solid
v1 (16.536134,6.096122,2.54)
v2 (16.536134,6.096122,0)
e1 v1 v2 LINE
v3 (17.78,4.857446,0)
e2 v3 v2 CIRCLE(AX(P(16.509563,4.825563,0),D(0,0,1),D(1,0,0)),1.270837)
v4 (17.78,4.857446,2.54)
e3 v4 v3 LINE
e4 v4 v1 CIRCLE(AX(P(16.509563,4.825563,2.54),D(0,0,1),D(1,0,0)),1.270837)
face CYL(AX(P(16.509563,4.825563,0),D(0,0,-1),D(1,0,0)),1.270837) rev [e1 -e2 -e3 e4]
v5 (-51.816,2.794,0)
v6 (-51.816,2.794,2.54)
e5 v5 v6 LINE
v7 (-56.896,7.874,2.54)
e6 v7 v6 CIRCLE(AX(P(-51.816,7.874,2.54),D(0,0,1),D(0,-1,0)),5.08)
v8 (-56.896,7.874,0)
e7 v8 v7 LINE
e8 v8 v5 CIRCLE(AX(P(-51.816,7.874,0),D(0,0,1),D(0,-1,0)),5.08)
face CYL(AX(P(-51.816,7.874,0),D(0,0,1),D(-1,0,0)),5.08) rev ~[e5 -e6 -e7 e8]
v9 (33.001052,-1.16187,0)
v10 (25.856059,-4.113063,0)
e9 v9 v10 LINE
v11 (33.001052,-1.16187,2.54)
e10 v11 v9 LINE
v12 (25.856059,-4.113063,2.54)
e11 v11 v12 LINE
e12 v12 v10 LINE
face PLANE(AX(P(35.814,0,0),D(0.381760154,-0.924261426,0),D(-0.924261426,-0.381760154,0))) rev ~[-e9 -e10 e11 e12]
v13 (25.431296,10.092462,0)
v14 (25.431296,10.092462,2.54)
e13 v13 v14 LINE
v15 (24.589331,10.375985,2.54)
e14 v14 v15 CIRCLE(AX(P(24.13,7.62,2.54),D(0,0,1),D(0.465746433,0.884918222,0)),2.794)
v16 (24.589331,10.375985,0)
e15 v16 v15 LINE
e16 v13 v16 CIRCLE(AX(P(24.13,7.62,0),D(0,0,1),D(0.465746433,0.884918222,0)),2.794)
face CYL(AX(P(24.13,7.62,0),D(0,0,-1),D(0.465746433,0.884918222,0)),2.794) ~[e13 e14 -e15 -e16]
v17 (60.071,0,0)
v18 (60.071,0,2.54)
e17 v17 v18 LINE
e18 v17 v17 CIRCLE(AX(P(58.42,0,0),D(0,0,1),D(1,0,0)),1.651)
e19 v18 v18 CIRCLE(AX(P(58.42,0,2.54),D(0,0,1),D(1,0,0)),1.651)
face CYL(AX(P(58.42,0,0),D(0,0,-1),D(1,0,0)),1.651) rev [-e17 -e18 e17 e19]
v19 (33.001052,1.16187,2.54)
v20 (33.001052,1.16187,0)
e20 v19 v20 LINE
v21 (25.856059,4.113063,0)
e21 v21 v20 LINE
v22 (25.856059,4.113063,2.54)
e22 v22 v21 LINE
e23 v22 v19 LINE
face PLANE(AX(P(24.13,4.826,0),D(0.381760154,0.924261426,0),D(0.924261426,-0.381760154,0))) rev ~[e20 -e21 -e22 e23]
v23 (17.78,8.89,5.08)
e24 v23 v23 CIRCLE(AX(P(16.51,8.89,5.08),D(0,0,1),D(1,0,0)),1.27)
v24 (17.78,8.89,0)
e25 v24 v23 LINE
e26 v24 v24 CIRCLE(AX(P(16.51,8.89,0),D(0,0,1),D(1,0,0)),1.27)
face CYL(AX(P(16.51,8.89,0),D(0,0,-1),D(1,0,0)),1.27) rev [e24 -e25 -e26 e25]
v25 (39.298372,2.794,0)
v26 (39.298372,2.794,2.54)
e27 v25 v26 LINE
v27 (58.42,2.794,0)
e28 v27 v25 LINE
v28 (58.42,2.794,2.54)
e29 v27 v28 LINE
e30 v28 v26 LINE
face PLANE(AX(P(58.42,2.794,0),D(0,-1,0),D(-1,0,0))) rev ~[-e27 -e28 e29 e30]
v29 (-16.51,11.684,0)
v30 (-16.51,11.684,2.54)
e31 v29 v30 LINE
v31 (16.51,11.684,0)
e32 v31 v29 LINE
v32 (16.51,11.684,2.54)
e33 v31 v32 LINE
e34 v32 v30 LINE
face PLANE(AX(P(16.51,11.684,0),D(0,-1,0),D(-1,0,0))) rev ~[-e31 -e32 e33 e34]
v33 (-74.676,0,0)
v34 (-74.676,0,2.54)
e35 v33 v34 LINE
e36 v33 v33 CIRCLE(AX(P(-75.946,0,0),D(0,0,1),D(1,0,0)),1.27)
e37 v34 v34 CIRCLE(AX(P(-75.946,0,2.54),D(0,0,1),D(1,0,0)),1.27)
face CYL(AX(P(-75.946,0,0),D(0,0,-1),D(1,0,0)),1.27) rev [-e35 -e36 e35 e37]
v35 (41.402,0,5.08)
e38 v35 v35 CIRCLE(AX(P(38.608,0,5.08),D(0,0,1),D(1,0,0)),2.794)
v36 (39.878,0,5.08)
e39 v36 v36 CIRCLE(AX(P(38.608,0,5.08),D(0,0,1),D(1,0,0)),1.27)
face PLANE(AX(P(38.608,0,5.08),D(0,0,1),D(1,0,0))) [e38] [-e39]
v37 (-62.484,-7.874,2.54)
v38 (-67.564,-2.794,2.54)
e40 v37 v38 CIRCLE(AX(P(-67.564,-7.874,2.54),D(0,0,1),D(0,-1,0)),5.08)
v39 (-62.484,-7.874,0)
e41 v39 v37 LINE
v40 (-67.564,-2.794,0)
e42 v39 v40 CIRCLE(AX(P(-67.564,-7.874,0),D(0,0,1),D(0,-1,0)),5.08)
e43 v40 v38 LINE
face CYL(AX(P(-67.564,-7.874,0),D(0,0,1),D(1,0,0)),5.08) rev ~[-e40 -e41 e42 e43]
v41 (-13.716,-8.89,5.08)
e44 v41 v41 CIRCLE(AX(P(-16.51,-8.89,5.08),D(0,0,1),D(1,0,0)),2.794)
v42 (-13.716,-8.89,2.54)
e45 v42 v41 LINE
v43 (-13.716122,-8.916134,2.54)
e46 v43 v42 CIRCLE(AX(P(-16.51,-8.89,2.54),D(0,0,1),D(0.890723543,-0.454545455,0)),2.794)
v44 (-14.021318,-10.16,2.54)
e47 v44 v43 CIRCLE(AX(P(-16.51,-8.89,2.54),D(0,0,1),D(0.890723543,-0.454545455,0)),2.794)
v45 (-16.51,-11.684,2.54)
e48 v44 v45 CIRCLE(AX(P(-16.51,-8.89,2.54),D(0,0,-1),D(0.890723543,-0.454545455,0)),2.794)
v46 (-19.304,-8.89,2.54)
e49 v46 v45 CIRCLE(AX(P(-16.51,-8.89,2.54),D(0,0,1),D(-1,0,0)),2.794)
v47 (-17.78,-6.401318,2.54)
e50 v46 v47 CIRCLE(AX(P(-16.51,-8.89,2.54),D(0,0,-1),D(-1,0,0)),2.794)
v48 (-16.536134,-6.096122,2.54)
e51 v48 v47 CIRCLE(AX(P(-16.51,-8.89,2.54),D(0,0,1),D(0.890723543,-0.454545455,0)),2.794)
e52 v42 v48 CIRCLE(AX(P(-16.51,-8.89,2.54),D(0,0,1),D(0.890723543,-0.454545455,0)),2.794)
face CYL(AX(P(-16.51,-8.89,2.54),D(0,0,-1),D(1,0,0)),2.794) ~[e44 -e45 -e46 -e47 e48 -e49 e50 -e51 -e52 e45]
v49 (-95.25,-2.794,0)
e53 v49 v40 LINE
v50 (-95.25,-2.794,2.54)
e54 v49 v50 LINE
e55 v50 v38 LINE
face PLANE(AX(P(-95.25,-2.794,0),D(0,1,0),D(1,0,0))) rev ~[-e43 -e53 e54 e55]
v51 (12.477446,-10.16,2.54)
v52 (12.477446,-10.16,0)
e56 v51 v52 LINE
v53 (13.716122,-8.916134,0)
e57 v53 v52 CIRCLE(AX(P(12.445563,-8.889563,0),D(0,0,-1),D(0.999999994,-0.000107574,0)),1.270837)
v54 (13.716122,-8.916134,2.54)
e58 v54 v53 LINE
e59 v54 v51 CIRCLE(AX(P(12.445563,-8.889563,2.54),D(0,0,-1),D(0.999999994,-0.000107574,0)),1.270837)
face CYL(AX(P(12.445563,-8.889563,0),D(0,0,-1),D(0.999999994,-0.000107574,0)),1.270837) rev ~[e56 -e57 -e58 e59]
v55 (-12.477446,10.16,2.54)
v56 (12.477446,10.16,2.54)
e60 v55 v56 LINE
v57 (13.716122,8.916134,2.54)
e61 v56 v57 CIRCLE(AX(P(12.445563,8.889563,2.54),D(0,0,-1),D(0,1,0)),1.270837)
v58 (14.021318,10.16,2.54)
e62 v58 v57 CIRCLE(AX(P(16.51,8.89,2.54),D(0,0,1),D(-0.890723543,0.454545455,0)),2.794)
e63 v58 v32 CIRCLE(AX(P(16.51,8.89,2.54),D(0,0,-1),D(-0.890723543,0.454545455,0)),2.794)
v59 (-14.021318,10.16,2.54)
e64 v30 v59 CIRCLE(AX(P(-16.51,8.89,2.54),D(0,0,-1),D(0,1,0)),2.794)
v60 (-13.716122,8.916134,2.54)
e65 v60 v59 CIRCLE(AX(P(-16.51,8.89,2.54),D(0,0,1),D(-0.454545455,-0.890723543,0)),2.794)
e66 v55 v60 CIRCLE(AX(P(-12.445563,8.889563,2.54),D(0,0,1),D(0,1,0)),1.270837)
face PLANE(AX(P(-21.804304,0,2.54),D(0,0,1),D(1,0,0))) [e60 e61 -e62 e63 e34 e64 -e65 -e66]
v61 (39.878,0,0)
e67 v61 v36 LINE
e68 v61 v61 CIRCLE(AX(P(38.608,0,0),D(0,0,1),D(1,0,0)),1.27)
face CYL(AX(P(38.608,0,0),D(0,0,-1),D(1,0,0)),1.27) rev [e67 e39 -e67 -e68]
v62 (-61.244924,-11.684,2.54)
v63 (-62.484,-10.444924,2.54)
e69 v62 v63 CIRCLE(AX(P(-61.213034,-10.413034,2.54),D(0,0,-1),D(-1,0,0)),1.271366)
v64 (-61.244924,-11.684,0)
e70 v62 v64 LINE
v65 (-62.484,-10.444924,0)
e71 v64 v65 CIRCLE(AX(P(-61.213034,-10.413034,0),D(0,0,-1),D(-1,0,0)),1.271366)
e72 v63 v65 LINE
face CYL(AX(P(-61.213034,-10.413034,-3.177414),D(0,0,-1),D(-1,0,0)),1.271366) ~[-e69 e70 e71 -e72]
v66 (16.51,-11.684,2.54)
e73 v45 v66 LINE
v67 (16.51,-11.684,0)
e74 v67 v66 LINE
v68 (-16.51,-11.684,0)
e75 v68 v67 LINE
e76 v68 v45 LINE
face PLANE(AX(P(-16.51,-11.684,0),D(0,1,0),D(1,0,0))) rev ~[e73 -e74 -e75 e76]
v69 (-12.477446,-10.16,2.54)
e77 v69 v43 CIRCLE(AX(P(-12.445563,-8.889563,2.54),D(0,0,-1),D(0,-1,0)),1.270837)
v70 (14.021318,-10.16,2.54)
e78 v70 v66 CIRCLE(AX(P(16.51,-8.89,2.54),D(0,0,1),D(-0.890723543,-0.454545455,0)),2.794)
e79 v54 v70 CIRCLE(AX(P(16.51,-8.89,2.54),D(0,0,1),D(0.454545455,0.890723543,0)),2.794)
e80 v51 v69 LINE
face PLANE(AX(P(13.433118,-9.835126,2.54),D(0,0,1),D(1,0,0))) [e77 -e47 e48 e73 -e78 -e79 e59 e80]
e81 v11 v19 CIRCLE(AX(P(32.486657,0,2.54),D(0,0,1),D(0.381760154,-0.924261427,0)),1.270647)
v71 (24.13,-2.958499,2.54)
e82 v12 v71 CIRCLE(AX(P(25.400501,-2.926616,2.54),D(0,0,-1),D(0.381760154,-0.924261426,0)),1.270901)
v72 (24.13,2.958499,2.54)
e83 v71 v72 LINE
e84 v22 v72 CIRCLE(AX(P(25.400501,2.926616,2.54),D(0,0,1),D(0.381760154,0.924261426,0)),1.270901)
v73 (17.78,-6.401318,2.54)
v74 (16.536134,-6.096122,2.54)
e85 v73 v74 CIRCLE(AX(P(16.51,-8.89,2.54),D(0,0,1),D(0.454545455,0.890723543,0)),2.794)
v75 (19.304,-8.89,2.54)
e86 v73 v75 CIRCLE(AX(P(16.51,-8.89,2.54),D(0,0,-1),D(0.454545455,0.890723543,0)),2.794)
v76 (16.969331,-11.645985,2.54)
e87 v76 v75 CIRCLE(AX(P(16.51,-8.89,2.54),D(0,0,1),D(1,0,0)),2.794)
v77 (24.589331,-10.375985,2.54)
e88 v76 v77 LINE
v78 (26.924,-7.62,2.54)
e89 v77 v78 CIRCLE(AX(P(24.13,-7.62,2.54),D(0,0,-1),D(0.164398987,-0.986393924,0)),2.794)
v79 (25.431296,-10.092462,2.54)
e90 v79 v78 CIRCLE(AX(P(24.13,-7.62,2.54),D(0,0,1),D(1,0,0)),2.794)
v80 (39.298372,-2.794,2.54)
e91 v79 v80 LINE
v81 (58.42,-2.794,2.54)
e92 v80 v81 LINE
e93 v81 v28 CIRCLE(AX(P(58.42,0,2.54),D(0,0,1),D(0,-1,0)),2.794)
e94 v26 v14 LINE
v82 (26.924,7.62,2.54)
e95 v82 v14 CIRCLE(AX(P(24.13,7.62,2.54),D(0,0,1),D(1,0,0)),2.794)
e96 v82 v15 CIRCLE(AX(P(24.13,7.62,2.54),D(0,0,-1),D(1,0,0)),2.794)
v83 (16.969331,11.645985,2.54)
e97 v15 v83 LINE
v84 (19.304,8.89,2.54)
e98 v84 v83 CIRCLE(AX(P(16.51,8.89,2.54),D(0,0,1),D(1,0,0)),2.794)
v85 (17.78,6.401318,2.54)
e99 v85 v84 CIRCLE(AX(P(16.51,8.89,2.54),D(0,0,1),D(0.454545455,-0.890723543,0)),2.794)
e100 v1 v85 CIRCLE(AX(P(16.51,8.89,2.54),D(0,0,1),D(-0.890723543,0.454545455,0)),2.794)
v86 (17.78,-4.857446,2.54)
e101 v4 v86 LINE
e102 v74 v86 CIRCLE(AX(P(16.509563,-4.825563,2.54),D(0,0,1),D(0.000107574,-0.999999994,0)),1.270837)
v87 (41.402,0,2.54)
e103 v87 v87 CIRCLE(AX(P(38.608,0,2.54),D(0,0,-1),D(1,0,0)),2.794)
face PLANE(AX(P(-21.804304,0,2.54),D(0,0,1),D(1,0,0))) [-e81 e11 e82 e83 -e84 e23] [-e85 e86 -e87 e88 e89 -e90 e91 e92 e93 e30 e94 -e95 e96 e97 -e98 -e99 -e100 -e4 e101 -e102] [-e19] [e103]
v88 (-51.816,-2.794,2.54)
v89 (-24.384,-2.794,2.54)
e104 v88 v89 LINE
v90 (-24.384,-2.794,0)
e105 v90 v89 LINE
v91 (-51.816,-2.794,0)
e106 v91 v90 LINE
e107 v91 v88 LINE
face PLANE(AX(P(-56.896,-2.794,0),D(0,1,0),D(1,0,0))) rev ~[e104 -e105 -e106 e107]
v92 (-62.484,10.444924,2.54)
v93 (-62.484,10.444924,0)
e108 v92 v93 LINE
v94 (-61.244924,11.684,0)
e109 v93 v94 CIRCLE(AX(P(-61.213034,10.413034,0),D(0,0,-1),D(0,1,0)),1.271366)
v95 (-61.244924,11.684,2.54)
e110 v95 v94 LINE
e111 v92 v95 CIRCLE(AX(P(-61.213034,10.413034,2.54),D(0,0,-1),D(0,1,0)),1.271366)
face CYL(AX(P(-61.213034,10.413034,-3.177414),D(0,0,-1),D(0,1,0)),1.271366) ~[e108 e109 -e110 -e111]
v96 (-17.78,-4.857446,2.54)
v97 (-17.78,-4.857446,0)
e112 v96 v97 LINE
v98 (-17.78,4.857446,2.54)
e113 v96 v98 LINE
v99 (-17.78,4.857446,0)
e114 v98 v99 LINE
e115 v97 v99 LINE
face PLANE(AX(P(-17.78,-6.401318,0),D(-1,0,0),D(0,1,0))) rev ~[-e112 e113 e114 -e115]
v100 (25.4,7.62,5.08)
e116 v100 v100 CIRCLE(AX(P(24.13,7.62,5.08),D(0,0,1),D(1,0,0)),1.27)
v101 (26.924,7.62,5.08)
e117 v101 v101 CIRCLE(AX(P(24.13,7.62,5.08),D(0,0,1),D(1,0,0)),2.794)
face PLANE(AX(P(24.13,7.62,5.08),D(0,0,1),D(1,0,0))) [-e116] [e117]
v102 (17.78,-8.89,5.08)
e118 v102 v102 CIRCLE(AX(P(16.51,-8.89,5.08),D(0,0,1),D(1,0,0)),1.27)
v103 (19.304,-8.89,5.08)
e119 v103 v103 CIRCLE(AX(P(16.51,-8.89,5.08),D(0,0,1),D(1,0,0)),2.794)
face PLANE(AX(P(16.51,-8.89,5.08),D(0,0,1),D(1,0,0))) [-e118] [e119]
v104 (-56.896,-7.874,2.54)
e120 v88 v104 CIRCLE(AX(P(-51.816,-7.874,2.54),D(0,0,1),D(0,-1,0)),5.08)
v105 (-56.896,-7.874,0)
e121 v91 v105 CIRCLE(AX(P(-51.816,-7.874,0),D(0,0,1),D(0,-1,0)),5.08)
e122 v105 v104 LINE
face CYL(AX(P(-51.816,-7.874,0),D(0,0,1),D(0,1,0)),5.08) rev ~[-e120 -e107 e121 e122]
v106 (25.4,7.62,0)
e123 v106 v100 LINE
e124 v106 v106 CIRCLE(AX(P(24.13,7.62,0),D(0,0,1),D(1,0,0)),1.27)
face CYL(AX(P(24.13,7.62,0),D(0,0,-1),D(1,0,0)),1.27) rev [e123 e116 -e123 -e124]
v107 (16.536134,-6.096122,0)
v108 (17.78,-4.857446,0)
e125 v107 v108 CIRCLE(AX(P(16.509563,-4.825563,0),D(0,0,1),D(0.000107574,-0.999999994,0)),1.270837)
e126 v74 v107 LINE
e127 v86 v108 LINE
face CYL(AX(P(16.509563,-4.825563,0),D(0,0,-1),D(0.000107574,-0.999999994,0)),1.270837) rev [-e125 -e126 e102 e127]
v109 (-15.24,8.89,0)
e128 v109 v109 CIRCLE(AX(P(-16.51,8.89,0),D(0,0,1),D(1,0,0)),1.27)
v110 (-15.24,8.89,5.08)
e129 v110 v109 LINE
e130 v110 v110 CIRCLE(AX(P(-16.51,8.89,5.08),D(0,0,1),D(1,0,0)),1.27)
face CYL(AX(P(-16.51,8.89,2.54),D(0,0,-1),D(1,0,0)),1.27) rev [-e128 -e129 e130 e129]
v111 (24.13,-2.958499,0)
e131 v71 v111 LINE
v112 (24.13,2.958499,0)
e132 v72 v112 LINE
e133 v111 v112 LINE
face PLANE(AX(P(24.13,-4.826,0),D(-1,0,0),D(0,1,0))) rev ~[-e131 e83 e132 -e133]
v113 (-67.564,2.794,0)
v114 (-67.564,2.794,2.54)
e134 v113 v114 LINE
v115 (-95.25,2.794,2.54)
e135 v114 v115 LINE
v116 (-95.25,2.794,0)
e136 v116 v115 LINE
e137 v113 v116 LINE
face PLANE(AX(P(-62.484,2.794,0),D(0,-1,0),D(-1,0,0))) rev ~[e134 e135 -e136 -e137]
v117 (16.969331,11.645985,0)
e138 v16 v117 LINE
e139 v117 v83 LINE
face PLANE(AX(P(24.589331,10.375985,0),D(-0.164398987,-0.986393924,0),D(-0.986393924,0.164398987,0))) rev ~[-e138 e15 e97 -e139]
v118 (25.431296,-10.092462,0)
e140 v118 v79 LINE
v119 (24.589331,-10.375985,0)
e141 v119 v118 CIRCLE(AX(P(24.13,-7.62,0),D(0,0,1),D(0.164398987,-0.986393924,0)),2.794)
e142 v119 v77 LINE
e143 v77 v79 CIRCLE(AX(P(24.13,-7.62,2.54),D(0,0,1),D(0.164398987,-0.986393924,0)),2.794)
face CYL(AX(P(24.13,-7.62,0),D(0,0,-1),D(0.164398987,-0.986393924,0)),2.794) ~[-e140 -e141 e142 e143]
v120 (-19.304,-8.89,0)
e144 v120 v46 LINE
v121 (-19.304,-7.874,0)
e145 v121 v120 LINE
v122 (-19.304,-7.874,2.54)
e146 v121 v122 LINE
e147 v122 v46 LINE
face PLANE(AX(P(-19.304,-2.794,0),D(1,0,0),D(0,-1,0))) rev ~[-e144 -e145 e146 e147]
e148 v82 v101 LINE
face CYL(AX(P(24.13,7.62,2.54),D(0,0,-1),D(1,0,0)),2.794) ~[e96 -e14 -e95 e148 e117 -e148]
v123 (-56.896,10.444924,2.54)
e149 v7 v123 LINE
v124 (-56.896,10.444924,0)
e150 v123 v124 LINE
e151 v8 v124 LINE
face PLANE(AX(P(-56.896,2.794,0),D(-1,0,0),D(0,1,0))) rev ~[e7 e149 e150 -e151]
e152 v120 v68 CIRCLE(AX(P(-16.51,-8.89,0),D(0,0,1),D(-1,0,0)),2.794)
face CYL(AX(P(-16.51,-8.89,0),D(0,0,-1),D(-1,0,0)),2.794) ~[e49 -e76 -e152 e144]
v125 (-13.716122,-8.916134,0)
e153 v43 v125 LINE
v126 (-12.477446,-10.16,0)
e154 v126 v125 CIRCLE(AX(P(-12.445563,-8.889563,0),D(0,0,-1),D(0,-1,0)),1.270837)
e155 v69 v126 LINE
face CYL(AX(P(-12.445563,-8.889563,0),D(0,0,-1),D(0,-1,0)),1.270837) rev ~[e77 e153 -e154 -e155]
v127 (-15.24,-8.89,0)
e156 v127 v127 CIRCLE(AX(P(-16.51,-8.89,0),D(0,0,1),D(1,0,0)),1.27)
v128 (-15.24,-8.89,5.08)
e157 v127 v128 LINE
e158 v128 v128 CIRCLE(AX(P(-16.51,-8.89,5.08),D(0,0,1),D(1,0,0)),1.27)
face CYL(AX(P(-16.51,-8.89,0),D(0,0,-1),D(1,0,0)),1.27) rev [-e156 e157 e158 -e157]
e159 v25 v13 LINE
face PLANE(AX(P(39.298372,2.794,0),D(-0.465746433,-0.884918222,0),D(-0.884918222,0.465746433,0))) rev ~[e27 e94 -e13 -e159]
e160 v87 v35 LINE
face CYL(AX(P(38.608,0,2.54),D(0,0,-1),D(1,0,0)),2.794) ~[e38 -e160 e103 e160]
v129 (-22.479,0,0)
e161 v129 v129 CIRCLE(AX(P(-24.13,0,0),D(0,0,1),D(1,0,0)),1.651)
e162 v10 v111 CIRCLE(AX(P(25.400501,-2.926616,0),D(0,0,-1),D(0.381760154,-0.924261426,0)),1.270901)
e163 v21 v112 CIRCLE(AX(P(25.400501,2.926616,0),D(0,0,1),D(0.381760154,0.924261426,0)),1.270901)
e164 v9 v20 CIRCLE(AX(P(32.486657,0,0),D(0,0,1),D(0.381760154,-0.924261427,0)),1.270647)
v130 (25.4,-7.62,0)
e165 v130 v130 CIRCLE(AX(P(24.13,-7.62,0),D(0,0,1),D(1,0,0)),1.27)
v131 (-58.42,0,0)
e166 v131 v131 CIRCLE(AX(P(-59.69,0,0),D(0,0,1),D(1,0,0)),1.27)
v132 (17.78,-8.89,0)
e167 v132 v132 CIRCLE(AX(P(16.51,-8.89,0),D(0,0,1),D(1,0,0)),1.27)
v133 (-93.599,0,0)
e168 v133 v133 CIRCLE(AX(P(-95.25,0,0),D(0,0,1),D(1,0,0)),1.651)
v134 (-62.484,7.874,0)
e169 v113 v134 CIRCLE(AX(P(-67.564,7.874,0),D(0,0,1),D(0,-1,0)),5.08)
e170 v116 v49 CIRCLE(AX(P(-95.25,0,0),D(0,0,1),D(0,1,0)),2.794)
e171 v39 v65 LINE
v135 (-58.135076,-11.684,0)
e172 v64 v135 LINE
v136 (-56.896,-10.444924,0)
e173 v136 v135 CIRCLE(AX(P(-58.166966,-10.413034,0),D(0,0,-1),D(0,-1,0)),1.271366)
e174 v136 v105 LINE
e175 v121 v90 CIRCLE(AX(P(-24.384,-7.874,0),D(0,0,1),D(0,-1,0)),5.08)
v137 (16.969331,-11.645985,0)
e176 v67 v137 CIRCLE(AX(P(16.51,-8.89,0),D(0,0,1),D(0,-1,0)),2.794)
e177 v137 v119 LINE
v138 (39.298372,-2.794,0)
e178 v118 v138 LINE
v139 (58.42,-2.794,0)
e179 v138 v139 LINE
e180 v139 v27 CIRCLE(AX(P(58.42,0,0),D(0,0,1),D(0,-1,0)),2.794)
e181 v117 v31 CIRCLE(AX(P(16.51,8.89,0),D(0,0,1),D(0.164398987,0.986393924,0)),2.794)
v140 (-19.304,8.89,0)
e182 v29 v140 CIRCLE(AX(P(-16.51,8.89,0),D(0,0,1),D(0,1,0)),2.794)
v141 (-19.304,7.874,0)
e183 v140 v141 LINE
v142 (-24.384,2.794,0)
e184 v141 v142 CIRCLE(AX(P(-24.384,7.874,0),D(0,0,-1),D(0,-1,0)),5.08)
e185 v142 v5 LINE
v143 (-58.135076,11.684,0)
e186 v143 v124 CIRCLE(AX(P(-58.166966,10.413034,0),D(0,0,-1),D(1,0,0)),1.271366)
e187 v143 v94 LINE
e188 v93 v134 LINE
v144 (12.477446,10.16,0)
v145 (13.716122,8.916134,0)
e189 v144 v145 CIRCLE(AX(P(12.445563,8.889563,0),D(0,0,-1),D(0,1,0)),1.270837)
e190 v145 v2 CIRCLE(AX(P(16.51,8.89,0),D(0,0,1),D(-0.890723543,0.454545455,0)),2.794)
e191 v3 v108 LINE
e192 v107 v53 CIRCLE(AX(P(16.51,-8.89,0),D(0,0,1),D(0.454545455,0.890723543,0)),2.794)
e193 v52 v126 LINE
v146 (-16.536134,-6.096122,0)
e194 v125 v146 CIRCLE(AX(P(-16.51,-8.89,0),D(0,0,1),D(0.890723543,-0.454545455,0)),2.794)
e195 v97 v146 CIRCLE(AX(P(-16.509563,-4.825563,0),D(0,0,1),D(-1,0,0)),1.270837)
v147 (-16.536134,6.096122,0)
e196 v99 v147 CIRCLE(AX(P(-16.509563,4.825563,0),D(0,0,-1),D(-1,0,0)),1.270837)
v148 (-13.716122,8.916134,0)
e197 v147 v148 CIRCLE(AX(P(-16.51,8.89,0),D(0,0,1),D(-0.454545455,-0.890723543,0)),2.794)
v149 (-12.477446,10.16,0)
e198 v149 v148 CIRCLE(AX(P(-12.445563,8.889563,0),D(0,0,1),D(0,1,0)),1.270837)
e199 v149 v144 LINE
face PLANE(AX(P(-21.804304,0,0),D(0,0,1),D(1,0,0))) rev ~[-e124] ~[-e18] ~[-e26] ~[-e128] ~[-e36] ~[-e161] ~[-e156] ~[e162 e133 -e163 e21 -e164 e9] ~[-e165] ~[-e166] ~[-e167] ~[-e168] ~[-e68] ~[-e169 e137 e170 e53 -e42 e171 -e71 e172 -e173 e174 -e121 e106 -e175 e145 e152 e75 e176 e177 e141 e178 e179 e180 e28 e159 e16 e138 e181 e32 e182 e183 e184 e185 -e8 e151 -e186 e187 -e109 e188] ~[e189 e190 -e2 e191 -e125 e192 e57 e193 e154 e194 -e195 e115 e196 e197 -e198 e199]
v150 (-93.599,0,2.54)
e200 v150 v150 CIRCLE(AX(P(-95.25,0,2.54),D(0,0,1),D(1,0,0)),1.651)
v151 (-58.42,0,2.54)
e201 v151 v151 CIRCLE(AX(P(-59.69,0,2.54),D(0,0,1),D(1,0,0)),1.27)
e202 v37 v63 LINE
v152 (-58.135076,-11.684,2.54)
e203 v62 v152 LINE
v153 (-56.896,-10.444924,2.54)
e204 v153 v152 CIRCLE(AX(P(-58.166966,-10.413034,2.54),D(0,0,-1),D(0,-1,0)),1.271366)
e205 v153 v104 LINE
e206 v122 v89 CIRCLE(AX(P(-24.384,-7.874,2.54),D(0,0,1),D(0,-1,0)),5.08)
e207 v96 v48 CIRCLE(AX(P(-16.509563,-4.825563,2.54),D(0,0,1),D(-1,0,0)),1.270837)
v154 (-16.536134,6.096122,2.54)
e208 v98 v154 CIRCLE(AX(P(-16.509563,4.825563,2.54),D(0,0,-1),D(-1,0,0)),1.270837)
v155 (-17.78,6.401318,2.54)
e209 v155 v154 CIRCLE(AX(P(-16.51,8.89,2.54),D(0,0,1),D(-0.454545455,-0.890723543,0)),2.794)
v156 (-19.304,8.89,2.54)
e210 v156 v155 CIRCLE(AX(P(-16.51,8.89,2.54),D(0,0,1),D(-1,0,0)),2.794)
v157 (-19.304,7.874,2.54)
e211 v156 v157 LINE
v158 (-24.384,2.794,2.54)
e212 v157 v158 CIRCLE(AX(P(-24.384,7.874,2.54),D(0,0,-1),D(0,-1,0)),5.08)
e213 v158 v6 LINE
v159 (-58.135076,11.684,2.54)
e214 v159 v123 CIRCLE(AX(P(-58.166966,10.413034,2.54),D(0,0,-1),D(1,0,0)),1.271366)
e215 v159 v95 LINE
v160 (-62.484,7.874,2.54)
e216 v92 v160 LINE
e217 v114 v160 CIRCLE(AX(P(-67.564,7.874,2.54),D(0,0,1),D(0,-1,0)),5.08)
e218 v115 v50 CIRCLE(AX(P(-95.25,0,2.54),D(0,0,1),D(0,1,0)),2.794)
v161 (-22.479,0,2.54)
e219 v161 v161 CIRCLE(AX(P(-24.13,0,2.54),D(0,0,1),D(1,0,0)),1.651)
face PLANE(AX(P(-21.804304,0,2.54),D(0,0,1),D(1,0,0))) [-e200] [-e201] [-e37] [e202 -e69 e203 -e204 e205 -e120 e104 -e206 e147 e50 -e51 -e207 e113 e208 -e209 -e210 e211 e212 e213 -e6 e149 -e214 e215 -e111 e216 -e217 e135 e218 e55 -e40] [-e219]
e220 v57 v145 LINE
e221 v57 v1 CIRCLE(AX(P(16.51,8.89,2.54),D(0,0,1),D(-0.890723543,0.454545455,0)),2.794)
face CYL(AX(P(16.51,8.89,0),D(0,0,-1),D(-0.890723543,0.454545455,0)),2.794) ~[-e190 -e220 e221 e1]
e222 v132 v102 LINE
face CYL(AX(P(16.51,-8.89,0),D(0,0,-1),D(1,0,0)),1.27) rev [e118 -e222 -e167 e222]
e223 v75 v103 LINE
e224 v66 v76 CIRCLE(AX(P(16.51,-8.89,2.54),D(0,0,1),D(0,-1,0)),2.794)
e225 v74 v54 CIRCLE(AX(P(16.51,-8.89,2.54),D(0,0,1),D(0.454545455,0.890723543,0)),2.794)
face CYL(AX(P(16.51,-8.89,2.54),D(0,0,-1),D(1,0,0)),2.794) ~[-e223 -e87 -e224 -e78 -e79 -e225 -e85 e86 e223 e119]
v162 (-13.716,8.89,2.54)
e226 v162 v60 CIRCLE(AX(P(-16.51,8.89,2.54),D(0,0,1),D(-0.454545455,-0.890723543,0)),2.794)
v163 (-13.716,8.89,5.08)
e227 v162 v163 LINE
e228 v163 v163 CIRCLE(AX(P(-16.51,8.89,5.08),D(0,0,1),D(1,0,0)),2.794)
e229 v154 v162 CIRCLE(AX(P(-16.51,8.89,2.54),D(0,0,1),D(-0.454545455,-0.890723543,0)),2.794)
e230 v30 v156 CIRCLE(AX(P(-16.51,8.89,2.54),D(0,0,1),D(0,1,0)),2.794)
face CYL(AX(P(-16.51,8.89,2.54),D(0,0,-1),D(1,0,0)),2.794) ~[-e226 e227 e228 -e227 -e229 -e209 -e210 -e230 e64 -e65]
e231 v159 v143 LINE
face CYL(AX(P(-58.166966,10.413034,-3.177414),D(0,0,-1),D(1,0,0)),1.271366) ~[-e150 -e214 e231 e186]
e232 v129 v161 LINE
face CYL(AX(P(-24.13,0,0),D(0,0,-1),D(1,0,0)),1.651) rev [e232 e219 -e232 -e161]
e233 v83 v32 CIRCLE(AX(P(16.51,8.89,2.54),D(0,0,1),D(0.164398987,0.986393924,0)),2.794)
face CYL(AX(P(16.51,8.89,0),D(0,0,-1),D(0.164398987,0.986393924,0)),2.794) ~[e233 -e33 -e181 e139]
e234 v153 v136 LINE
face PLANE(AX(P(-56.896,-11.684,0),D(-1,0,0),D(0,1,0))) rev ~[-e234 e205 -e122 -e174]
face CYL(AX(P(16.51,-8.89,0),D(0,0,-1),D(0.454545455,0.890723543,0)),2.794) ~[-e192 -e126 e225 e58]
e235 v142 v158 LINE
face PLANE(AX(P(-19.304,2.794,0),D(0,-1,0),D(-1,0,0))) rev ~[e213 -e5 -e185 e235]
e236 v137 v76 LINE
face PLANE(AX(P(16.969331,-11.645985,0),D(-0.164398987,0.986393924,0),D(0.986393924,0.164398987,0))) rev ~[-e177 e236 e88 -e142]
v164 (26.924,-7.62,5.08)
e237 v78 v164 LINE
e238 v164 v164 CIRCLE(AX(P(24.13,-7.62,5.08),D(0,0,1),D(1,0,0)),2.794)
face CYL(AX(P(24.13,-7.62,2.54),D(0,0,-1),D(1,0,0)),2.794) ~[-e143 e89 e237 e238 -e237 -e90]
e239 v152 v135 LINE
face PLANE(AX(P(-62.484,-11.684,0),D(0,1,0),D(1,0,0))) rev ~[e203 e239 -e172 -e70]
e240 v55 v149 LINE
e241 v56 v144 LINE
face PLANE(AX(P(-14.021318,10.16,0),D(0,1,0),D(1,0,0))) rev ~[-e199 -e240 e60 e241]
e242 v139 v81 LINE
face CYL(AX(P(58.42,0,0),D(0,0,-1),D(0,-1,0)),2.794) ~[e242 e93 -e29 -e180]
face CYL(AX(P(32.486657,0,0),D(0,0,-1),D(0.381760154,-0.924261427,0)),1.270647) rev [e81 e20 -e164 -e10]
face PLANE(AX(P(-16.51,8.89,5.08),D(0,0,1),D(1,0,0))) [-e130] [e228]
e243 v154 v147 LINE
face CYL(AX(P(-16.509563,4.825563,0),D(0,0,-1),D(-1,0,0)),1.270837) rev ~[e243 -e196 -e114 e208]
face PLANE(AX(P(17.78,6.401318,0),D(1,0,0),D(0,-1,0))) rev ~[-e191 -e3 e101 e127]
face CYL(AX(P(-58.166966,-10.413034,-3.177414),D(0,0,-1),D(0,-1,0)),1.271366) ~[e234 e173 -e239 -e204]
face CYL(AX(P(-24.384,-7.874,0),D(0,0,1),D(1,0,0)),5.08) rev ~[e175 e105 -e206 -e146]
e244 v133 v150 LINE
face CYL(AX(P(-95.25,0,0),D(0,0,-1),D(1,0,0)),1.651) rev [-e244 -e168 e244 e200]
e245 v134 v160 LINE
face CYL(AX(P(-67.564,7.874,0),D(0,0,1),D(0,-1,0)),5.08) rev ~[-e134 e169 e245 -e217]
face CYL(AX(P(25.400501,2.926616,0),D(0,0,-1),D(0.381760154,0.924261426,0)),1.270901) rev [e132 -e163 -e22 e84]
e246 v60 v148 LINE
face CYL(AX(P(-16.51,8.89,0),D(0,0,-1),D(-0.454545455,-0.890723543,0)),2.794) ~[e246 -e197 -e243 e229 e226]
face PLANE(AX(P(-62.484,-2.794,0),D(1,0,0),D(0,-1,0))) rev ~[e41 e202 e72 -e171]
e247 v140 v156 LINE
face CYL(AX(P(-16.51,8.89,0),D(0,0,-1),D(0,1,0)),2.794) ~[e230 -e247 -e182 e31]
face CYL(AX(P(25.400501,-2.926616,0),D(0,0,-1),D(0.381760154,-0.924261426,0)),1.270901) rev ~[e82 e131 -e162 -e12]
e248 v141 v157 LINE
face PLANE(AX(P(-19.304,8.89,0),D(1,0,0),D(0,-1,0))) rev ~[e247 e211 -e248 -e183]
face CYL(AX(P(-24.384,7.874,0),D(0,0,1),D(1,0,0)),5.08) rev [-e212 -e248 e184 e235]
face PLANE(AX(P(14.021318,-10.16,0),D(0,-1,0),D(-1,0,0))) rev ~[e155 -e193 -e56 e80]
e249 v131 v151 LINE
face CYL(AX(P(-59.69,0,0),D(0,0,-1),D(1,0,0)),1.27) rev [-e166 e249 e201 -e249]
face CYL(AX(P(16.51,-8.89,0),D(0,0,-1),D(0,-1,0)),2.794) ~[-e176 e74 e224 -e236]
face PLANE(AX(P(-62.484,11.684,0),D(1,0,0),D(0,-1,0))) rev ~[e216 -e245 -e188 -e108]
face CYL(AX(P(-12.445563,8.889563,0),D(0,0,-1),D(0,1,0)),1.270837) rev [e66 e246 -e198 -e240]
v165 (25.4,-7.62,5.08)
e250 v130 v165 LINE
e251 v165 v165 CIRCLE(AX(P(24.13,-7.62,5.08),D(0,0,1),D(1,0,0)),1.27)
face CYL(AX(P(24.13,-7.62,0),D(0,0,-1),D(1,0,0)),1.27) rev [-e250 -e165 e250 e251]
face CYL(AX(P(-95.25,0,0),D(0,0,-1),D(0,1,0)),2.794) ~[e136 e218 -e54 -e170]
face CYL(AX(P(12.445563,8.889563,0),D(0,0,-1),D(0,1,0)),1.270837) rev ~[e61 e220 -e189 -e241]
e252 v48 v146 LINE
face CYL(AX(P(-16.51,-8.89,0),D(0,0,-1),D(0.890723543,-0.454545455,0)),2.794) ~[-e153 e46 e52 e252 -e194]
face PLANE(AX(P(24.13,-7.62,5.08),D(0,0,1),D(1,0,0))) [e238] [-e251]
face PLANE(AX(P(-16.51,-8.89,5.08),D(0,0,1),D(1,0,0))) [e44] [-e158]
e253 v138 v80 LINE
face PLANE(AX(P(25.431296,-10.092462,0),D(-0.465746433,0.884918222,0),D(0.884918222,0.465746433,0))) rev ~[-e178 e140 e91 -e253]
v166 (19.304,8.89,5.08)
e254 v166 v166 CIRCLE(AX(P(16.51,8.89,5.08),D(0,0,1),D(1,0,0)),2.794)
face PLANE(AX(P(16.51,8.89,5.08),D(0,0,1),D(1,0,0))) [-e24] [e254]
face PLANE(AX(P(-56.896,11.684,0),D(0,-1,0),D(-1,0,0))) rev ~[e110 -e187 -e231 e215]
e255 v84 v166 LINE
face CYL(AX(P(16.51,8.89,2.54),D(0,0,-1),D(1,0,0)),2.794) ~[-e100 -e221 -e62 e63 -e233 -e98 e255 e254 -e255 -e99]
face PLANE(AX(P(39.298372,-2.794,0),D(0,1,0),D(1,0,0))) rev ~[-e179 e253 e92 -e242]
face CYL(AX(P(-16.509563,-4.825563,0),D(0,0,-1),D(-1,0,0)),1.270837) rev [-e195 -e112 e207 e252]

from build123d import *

# Parameters (mm, degrees)
F1_R        = 1.27
F1_R_2      = 1.651
F2_DEPTH    = 2.54
F3_R        = 2.794
F3_R_2      = 1.27
F4_DEPTH    = 2.54
F5_T1_DEPTH = 2.54
F5_T3_DEPTH = 8.8948287418
F6_R        = 5.08


# Not quite as in the source:
# - a fillet or chamfer that OpenCascade refuses, or shapes differently, is made with other operations: its cross-section is extruded or revolved along the edge and cut away or added


with BuildPart() as f2:
    # F1 (on Top) → F2 (new body)
    with BuildSketch(Plane.XY):
        with BuildLine():
            ThreePointArc((-16.51, 11.684), (-18.4856563466, 10.8656563466), (-19.304, 8.89))
            Line((-19.304, 8.89), (-19.304, 2.794))
            Line((-19.304, 2.794), (-24.13, 2.794))
            Line((-24.13, 2.794), (-56.896, 2.794))
            Line((-56.896, 2.794), (-56.896, 11.684))
            Line((-56.896, 11.684), (-62.484, 11.684))
            Line((-62.484, 11.684), (-62.484, 2.794))
            Line((-62.484, 2.794), (-95.25, 2.794))
            ThreePointArc((-95.25, 2.794), (-98.044, 0), (-95.25, -2.794))
            Line((-95.25, -2.794), (-62.484, -2.794))
            Line((-62.484, -2.794), (-62.484, -11.684))
            Line((-62.484, -11.684), (-56.896, -11.684))
            Line((-56.896, -11.684), (-56.896, -2.794))
            Line((-56.896, -2.794), (-24.13, -2.794))
            Line((-24.13, -2.794), (-19.304, -2.794))
            Line((-19.304, -2.794), (-19.304, -8.89))
            ThreePointArc((-19.304, -8.89), (-18.4856563466, -10.8656563466), (-16.51, -11.684))
            Line((-16.51, -11.684), (16.51, -11.684))
            ThreePointArc((16.51, -11.684), (16.7404506051, -11.6744799368), (16.9693307705, -11.6459846232))
            Line((16.9693307705, -11.6459846232), (24.5893307705, -10.3759846232))
            ThreePointArc((24.5893307705, -10.3759846232), (25.0216544083, -10.2679026448), (25.4312955333, -10.0924615133))
            Line((25.4312955333, -10.0924615133), (39.2983724087, -2.794))
            Line((39.2983724087, -2.794), (58.42, -2.794))
            ThreePointArc((58.42, -2.794), (61.214, 0), (58.42, 2.794))
            Line((58.42, 2.794), (39.2983724087, 2.794))
            Line((39.2983724087, 2.794), (25.4312955333, 10.0924615133))
            ThreePointArc((25.4312955333, 10.0924615133), (25.0216544083, 10.2679026448), (24.5893307705, 10.3759846232))
            Line((24.5893307705, 10.3759846232), (16.9693307705, 11.6459846232))
            ThreePointArc((16.9693307705, 11.6459846232), (16.7404506051, 11.6744799368), (16.51, 11.684))
            Line((16.51, 11.684), (-16.51, 11.684))
        make_face()
        with Locations((-16.51, -8.89)):
            Circle(F1_R, mode=Mode.SUBTRACT)
        with Locations((16.51, -8.89)):
            Circle(F1_R, mode=Mode.SUBTRACT)
        with Locations((24.13, -7.62)):
            Circle(F1_R, mode=Mode.SUBTRACT)
        with Locations((-95.25, 0)):
            Circle(F1_R_2, mode=Mode.SUBTRACT)
        with Locations((-75.946, 0)):
            Circle(F1_R, mode=Mode.SUBTRACT)
        with Locations((-59.69, 0)):
            Circle(F1_R, mode=Mode.SUBTRACT)
        with Locations((-24.13, 0)):
            Circle(F1_R_2, mode=Mode.SUBTRACT)
        with BuildLine():
            Line((-17.78, -6.4013184213), (-17.78, 6.4013184213))
            ThreePointArc((-17.78, 6.4013184213), (-14.5343436534, 6.9143436534), (-14.0213184213, 10.16))
            Line((-14.0213184213, 10.16), (14.0213184213, 10.16))
            ThreePointArc((14.0213184213, 10.16), (14.5343436534, 6.9143436534), (17.78, 6.4013184213))
            Line((17.78, 6.4013184213), (17.78, -6.4013184213))
            ThreePointArc((17.78, -6.4013184213), (14.5343436534, -6.9143436534), (14.0213184213, -10.16))
            Line((14.0213184213, -10.16), (-14.0213184213, -10.16))
            ThreePointArc((-14.0213184213, -10.16), (-14.5343436534, -6.9143436534), (-17.78, -6.4013184213))
        make_face(mode=Mode.SUBTRACT)
        Polygon((24.13, -4.826), (24.13, 4.826), (35.814, 0), align=None, mode=Mode.SUBTRACT)
        with Locations((38.608, 0)):
            Circle(F1_R, mode=Mode.SUBTRACT)
        with Locations((58.42, 0)):
            Circle(F1_R_2, mode=Mode.SUBTRACT)
        with Locations((-16.51, 8.89)):
            Circle(F1_R, mode=Mode.SUBTRACT)
        with Locations((16.51, 8.89)):
            Circle(F1_R, mode=Mode.SUBTRACT)
        with Locations((24.13, 7.62)):
            Circle(F1_R, mode=Mode.SUBTRACT)
    extrude(amount=F2_DEPTH)

    # F3 (on face) → F4 (join)
    with BuildSketch(Plane.XY.offset(2.54)):
        with Locations((-16.51, 8.89)):
            Circle(F3_R)
        with Locations((-16.51, 8.89)):
            Circle(F3_R_2, mode=Mode.SUBTRACT)
        with Locations((-16.51, -8.89)):
            Circle(F3_R)
        with Locations((-16.51, -8.89)):
            Circle(F3_R_2, mode=Mode.SUBTRACT)
        with Locations((16.51, 8.89)):
            Circle(F3_R)
        with Locations((16.51, 8.89)):
            Circle(F3_R_2, mode=Mode.SUBTRACT)
        with Locations((16.51, -8.89)):
            Circle(F3_R)
        with Locations((16.51, -8.89)):
            Circle(F3_R_2, mode=Mode.SUBTRACT)
        with Locations((24.13, 7.62)):
            Circle(F3_R)
        with Locations((24.13, 7.62)):
            Circle(F3_R_2, mode=Mode.SUBTRACT)
        with Locations((24.13, -7.62)):
            Circle(F3_R)
        with Locations((24.13, -7.62)):
            Circle(F3_R_2, mode=Mode.SUBTRACT)
        with Locations((38.608, 0)):
            Circle(F3_R)
        with Locations((38.608, 0)):
            Circle(F3_R_2, mode=Mode.SUBTRACT)
    extrude(amount=F4_DEPTH)

    # F5: fillet of radius 1.27 on 15 edges, made by hand

    # F5_s2 → F5_t1 (join)
    with BuildSketch(Plane.XY):
        with BuildLine():
            ThreePointArc((12.4455627954, 10.1604), (13.3441320819, 9.7882287264), (13.7164000162, 8.889699481))
            Line((13.7164000162, 8.889699481), (13.8434837382, 8.8897131519))
            ThreePointArc((13.8434837382, 8.8897131519), (13.9169420749, 9.5132920875), (14.1345148852, 10.1022346714))
            Line((14.1345148852, 10.1022346714), (14.0213184213, 10.2870837228))
            ThreePointArc((14.0213184213, 10.2870837228), (13.2334406084, 10.2870837228), (12.4455627954, 10.2874837228))
            Line((12.4455627954, 10.2874837228), (12.4455627954, 10.1604))
        make_face()
        with BuildLine():
            ThreePointArc((-17.7804, 4.8255627954), (-17.4082287264, 5.7241320819), (-16.509699481, 6.0964000162))
            Line((-16.509699481, 6.0964000162), (-16.5097131519, 6.2234837382))
            ThreePointArc((-16.5097131519, 6.2234837382), (-17.1332920875, 6.2969420748), (-17.7222346714, 6.5145148852))
            Line((-17.7222346714, 6.5145148852), (-17.9070837228, 6.4013184213))
            ThreePointArc((-17.9070837228, 6.4013184213), (-17.9070837228, 5.6134406084), (-17.9074837228, 4.8255627954))
            Line((-17.9074837228, 4.8255627954), (-17.7804, 4.8255627954))
        make_face()
        with BuildLine():
            ThreePointArc((-12.4455627954, 10.1604), (-13.3441320819, 9.7882287264), (-13.7164000162, 8.889699481))
            Line((-13.7164000162, 8.889699481), (-13.8434837382, 8.8897131519))
            ThreePointArc((-13.8434837382, 8.8897131519), (-13.9169420748, 9.5132920875), (-14.1345148852, 10.1022346714))
            Line((-14.1345148852, 10.1022346714), (-14.0213184213, 10.2870837228))
            ThreePointArc((-14.0213184213, 10.2870837228), (-13.2334406084, 10.2870837228), (-12.4455627954, 10.2874837228))
            Line((-12.4455627954, 10.2874837228), (-12.4455627954, 10.1604))
        make_face()
        with BuildLine():
            ThreePointArc((-12.4455627954, -10.1604), (-13.3441320819, -9.7882287264), (-13.7164000162, -8.889699481))
            Line((-13.7164000162, -8.889699481), (-13.8434837382, -8.8897131519))
            ThreePointArc((-13.8434837382, -8.8897131519), (-13.9169420748, -9.5132920875), (-14.1345148852, -10.1022346714))
            Line((-14.1345148852, -10.1022346714), (-14.0213184213, -10.2870837228))
            ThreePointArc((-14.0213184213, -10.2870837228), (-13.2334406084, -10.2870837228), (-12.4455627954, -10.2874837228))
            Line((-12.4455627954, -10.2874837228), (-12.4455627954, -10.1604))
        make_face()
        with BuildLine():
            ThreePointArc((-17.7804, -4.8255627954), (-17.4082287264, -5.7241320819), (-16.509699481, -6.0964000162))
            Line((-16.509699481, -6.0964000162), (-16.5097131519, -6.2234837382))
            ThreePointArc((-16.5097131519, -6.2234837382), (-17.1332920875, -6.2969420748), (-17.7222346714, -6.5145148852))
            Line((-17.7222346714, -6.5145148852), (-17.9070837228, -6.4013184213))
            ThreePointArc((-17.9070837228, -6.4013184213), (-17.9070837228, -5.6134406084), (-17.9074837228, -4.8255627954))
            Line((-17.9074837228, -4.8255627954), (-17.7804, -4.8255627954))
        make_face()
        with BuildLine():
            ThreePointArc((13.7164000162, -8.889699481), (13.3441320819, -9.7882287264), (12.4455627954, -10.1604))
            Line((12.4455627954, -10.1604), (12.4455627954, -10.2874837228))
            ThreePointArc((12.4455627954, -10.2874837228), (13.2334406084, -10.2870837228), (14.0213184213, -10.2870837228))
            Line((14.0213184213, -10.2870837228), (14.1345148852, -10.1022346714))
            ThreePointArc((14.1345148852, -10.1022346714), (13.9169420748, -9.5132920875), (13.8434837382, -8.8897131519))
            Line((13.8434837382, -8.8897131519), (13.7164000162, -8.889699481))
        make_face()
        with BuildLine():
            ThreePointArc((16.509699481, -6.0964000162), (17.4082287264, -5.7241320819), (17.7804, -4.8255627954))
            Line((17.7804, -4.8255627954), (17.9074837228, -4.8255627954))
            ThreePointArc((17.9074837228, -4.8255627954), (17.9070837228, -5.6134406084), (17.9070837228, -6.4013184213))
            Line((17.9070837228, -6.4013184213), (17.7222346714, -6.5145148852))
            ThreePointArc((17.7222346714, -6.5145148852), (17.1332920875, -6.2969420748), (16.5097131519, -6.2234837382))
            Line((16.5097131519, -6.2234837382), (16.509699481, -6.0964000162))
        make_face()
        with BuildLine():
            ThreePointArc((17.7804, 4.8255627954), (17.4082287264, 5.7241320819), (16.509699481, 6.0964000162))
            Line((16.509699481, 6.0964000162), (16.5097131519, 6.2234837382))
            ThreePointArc((16.5097131519, 6.2234837382), (17.1332920875, 6.2969420749), (17.7222346714, 6.5145148852))
            Line((17.7222346714, 6.5145148852), (17.9070837228, 6.4013184213))
            ThreePointArc((17.9070837228, 6.4013184213), (17.9070837228, 5.6134406084), (17.9074837228, 4.8255627954))
            Line((17.9074837228, 4.8255627954), (17.7804, 4.8255627954))
        make_face()
        with BuildLine():
            ThreePointArc((25.8856801845, 4.1012605278), (24.6938983618, 3.9829784639), (24.1296, 2.9266158754))
            Line((24.1296, 2.9266158754), (24.0025099128, 2.9266158754))
            ThreePointArc((24.0025099128, 2.9266158754), (24.0029099128, 3.8763079377), (24.0029099128, 4.826))
            Line((24.0029099128, 4.826), (24.1785179313, 4.9434644652))
            ThreePointArc((24.1785179313, 4.9434644652), (25.0562816715, 4.5809098769), (25.9341981158, 4.2187249931))
            Line((25.9341981158, 4.2187249931), (25.8856801845, 4.1012605278))
        make_face()
        with BuildLine():
            ThreePointArc((25.8856801845, -4.1012605278), (24.6938983618, -3.9829784639), (24.1296, -2.9266158754))
            Line((24.1296, -2.9266158754), (24.0025099128, -2.9266158754))
            ThreePointArc((24.0025099128, -2.9266158754), (24.0029099128, -3.8763079377), (24.0029099128, -4.826))
            Line((24.0029099128, -4.826), (24.1785179313, -4.9434644652))
            ThreePointArc((24.1785179313, -4.9434644652), (25.0562816715, -4.5809098769), (25.9341981158, -4.2187249931))
            Line((25.9341981158, -4.2187249931), (25.8856801845, -4.1012605278))
        make_face()
        with BuildLine():
            ThreePointArc((32.9717393402, -1.174410007), (33.7573039441, 0), (32.9717393402, 1.174410007))
            Line((32.9717393402, 1.174410007), (33.0202475797, 1.2918510077))
            ThreePointArc((33.0202475797, 1.2918510077), (34.4413015575, 0.7044611519), (35.8625082394, 0.1174410007))
            Line((35.8625082394, 0.1174410007), (35.8625082394, -0.1174410007))
            ThreePointArc((35.8625082394, -0.1174410007), (34.4413015575, -0.7044611519), (33.0202475797, -1.2918510077))
            Line((33.0202475797, -1.2918510077), (32.9717393402, -1.174410007))
        make_face()
    extrude(amount=F5_T1_DEPTH)

    # F5_s4 → F5_t3 (cut)
    with BuildSketch(Plane.XY.offset(-3.1774143709)):
        with BuildLine():
            ThreePointArc((-61.2130343146, 11.6844), (-62.1120256121, 11.3120256121), (-62.4844, 10.4130343146))
            Line((-62.4844, 10.4130343146), (-62.6115365685, 10.4130343146))
            ThreePointArc((-62.6115365685, 10.4130343146), (-62.6111365685, 11.0485171573), (-62.6111365685, 11.684))
            Line((-62.6111365685, 11.684), (-62.484, 11.8111365685))
            ThreePointArc((-62.484, 11.8111365685), (-61.8485171573, 11.8111365685), (-61.2130343146, 11.8115365685))
            Line((-61.2130343146, 11.8115365685), (-61.2130343146, 11.6844))
        make_face()
        with BuildLine():
            ThreePointArc((-58.1669656854, -11.6844), (-57.2679743879, -11.3120256121), (-56.8956, -10.4130343146))
            Line((-56.8956, -10.4130343146), (-56.7684634315, -10.4130343146))
            ThreePointArc((-56.7684634315, -10.4130343146), (-56.7688634315, -11.0485171573), (-56.7688634315, -11.684))
            Line((-56.7688634315, -11.684), (-56.896, -11.8111365685))
            ThreePointArc((-56.896, -11.8111365685), (-57.5314828427, -11.8111365685), (-58.1669656854, -11.8115365685))
            Line((-58.1669656854, -11.8115365685), (-58.1669656854, -11.6844))
        make_face()
        with BuildLine():
            ThreePointArc((-62.4844, -10.4130343146), (-62.1120256121, -11.3120256121), (-61.2130343146, -11.6844))
            Line((-61.2130343146, -11.6844), (-61.2130343146, -11.8115365685))
            ThreePointArc((-61.2130343146, -11.8115365685), (-61.8485171573, -11.8111365685), (-62.484, -11.8111365685))
            Line((-62.484, -11.8111365685), (-62.6111365685, -11.684))
            ThreePointArc((-62.6111365685, -11.684), (-62.6111365685, -11.0485171573), (-62.6115365685, -10.4130343146))
            Line((-62.6115365685, -10.4130343146), (-62.4844, -10.4130343146))
        make_face()
        with BuildLine():
            ThreePointArc((-56.8956, 10.4130343146), (-57.2679743879, 11.3120256121), (-58.1669656854, 11.6844))
            Line((-58.1669656854, 11.6844), (-58.1669656854, 11.8115365685))
            ThreePointArc((-58.1669656854, 11.8115365685), (-57.5314828427, 11.8111365685), (-56.896, 11.8111365685))
            Line((-56.896, 11.8111365685), (-56.7688634315, 11.684))
            ThreePointArc((-56.7688634315, 11.684), (-56.7688634315, 11.0485171573), (-56.7684634315, 10.4130343146))
            Line((-56.7684634315, 10.4130343146), (-56.8956, 10.4130343146))
        make_face()
    extrude(amount=F5_T3_DEPTH, mode=Mode.SUBTRACT)

    # F6
    f6_edges = [f2.edges().sort_by_distance(p)[0] for p in [
        (-62.484, 2.794, 1.27),
        (-19.304, 2.794, 1.27),
        (-62.484, -2.794, 1.27),
        (-56.896, -2.794, 1.27),
        (-56.896, 2.794, 1.27),
        (-19.304, -2.794, 1.27),
    ]]
    fillet(f6_edges, radius=F6_R)


solid = f2.part
